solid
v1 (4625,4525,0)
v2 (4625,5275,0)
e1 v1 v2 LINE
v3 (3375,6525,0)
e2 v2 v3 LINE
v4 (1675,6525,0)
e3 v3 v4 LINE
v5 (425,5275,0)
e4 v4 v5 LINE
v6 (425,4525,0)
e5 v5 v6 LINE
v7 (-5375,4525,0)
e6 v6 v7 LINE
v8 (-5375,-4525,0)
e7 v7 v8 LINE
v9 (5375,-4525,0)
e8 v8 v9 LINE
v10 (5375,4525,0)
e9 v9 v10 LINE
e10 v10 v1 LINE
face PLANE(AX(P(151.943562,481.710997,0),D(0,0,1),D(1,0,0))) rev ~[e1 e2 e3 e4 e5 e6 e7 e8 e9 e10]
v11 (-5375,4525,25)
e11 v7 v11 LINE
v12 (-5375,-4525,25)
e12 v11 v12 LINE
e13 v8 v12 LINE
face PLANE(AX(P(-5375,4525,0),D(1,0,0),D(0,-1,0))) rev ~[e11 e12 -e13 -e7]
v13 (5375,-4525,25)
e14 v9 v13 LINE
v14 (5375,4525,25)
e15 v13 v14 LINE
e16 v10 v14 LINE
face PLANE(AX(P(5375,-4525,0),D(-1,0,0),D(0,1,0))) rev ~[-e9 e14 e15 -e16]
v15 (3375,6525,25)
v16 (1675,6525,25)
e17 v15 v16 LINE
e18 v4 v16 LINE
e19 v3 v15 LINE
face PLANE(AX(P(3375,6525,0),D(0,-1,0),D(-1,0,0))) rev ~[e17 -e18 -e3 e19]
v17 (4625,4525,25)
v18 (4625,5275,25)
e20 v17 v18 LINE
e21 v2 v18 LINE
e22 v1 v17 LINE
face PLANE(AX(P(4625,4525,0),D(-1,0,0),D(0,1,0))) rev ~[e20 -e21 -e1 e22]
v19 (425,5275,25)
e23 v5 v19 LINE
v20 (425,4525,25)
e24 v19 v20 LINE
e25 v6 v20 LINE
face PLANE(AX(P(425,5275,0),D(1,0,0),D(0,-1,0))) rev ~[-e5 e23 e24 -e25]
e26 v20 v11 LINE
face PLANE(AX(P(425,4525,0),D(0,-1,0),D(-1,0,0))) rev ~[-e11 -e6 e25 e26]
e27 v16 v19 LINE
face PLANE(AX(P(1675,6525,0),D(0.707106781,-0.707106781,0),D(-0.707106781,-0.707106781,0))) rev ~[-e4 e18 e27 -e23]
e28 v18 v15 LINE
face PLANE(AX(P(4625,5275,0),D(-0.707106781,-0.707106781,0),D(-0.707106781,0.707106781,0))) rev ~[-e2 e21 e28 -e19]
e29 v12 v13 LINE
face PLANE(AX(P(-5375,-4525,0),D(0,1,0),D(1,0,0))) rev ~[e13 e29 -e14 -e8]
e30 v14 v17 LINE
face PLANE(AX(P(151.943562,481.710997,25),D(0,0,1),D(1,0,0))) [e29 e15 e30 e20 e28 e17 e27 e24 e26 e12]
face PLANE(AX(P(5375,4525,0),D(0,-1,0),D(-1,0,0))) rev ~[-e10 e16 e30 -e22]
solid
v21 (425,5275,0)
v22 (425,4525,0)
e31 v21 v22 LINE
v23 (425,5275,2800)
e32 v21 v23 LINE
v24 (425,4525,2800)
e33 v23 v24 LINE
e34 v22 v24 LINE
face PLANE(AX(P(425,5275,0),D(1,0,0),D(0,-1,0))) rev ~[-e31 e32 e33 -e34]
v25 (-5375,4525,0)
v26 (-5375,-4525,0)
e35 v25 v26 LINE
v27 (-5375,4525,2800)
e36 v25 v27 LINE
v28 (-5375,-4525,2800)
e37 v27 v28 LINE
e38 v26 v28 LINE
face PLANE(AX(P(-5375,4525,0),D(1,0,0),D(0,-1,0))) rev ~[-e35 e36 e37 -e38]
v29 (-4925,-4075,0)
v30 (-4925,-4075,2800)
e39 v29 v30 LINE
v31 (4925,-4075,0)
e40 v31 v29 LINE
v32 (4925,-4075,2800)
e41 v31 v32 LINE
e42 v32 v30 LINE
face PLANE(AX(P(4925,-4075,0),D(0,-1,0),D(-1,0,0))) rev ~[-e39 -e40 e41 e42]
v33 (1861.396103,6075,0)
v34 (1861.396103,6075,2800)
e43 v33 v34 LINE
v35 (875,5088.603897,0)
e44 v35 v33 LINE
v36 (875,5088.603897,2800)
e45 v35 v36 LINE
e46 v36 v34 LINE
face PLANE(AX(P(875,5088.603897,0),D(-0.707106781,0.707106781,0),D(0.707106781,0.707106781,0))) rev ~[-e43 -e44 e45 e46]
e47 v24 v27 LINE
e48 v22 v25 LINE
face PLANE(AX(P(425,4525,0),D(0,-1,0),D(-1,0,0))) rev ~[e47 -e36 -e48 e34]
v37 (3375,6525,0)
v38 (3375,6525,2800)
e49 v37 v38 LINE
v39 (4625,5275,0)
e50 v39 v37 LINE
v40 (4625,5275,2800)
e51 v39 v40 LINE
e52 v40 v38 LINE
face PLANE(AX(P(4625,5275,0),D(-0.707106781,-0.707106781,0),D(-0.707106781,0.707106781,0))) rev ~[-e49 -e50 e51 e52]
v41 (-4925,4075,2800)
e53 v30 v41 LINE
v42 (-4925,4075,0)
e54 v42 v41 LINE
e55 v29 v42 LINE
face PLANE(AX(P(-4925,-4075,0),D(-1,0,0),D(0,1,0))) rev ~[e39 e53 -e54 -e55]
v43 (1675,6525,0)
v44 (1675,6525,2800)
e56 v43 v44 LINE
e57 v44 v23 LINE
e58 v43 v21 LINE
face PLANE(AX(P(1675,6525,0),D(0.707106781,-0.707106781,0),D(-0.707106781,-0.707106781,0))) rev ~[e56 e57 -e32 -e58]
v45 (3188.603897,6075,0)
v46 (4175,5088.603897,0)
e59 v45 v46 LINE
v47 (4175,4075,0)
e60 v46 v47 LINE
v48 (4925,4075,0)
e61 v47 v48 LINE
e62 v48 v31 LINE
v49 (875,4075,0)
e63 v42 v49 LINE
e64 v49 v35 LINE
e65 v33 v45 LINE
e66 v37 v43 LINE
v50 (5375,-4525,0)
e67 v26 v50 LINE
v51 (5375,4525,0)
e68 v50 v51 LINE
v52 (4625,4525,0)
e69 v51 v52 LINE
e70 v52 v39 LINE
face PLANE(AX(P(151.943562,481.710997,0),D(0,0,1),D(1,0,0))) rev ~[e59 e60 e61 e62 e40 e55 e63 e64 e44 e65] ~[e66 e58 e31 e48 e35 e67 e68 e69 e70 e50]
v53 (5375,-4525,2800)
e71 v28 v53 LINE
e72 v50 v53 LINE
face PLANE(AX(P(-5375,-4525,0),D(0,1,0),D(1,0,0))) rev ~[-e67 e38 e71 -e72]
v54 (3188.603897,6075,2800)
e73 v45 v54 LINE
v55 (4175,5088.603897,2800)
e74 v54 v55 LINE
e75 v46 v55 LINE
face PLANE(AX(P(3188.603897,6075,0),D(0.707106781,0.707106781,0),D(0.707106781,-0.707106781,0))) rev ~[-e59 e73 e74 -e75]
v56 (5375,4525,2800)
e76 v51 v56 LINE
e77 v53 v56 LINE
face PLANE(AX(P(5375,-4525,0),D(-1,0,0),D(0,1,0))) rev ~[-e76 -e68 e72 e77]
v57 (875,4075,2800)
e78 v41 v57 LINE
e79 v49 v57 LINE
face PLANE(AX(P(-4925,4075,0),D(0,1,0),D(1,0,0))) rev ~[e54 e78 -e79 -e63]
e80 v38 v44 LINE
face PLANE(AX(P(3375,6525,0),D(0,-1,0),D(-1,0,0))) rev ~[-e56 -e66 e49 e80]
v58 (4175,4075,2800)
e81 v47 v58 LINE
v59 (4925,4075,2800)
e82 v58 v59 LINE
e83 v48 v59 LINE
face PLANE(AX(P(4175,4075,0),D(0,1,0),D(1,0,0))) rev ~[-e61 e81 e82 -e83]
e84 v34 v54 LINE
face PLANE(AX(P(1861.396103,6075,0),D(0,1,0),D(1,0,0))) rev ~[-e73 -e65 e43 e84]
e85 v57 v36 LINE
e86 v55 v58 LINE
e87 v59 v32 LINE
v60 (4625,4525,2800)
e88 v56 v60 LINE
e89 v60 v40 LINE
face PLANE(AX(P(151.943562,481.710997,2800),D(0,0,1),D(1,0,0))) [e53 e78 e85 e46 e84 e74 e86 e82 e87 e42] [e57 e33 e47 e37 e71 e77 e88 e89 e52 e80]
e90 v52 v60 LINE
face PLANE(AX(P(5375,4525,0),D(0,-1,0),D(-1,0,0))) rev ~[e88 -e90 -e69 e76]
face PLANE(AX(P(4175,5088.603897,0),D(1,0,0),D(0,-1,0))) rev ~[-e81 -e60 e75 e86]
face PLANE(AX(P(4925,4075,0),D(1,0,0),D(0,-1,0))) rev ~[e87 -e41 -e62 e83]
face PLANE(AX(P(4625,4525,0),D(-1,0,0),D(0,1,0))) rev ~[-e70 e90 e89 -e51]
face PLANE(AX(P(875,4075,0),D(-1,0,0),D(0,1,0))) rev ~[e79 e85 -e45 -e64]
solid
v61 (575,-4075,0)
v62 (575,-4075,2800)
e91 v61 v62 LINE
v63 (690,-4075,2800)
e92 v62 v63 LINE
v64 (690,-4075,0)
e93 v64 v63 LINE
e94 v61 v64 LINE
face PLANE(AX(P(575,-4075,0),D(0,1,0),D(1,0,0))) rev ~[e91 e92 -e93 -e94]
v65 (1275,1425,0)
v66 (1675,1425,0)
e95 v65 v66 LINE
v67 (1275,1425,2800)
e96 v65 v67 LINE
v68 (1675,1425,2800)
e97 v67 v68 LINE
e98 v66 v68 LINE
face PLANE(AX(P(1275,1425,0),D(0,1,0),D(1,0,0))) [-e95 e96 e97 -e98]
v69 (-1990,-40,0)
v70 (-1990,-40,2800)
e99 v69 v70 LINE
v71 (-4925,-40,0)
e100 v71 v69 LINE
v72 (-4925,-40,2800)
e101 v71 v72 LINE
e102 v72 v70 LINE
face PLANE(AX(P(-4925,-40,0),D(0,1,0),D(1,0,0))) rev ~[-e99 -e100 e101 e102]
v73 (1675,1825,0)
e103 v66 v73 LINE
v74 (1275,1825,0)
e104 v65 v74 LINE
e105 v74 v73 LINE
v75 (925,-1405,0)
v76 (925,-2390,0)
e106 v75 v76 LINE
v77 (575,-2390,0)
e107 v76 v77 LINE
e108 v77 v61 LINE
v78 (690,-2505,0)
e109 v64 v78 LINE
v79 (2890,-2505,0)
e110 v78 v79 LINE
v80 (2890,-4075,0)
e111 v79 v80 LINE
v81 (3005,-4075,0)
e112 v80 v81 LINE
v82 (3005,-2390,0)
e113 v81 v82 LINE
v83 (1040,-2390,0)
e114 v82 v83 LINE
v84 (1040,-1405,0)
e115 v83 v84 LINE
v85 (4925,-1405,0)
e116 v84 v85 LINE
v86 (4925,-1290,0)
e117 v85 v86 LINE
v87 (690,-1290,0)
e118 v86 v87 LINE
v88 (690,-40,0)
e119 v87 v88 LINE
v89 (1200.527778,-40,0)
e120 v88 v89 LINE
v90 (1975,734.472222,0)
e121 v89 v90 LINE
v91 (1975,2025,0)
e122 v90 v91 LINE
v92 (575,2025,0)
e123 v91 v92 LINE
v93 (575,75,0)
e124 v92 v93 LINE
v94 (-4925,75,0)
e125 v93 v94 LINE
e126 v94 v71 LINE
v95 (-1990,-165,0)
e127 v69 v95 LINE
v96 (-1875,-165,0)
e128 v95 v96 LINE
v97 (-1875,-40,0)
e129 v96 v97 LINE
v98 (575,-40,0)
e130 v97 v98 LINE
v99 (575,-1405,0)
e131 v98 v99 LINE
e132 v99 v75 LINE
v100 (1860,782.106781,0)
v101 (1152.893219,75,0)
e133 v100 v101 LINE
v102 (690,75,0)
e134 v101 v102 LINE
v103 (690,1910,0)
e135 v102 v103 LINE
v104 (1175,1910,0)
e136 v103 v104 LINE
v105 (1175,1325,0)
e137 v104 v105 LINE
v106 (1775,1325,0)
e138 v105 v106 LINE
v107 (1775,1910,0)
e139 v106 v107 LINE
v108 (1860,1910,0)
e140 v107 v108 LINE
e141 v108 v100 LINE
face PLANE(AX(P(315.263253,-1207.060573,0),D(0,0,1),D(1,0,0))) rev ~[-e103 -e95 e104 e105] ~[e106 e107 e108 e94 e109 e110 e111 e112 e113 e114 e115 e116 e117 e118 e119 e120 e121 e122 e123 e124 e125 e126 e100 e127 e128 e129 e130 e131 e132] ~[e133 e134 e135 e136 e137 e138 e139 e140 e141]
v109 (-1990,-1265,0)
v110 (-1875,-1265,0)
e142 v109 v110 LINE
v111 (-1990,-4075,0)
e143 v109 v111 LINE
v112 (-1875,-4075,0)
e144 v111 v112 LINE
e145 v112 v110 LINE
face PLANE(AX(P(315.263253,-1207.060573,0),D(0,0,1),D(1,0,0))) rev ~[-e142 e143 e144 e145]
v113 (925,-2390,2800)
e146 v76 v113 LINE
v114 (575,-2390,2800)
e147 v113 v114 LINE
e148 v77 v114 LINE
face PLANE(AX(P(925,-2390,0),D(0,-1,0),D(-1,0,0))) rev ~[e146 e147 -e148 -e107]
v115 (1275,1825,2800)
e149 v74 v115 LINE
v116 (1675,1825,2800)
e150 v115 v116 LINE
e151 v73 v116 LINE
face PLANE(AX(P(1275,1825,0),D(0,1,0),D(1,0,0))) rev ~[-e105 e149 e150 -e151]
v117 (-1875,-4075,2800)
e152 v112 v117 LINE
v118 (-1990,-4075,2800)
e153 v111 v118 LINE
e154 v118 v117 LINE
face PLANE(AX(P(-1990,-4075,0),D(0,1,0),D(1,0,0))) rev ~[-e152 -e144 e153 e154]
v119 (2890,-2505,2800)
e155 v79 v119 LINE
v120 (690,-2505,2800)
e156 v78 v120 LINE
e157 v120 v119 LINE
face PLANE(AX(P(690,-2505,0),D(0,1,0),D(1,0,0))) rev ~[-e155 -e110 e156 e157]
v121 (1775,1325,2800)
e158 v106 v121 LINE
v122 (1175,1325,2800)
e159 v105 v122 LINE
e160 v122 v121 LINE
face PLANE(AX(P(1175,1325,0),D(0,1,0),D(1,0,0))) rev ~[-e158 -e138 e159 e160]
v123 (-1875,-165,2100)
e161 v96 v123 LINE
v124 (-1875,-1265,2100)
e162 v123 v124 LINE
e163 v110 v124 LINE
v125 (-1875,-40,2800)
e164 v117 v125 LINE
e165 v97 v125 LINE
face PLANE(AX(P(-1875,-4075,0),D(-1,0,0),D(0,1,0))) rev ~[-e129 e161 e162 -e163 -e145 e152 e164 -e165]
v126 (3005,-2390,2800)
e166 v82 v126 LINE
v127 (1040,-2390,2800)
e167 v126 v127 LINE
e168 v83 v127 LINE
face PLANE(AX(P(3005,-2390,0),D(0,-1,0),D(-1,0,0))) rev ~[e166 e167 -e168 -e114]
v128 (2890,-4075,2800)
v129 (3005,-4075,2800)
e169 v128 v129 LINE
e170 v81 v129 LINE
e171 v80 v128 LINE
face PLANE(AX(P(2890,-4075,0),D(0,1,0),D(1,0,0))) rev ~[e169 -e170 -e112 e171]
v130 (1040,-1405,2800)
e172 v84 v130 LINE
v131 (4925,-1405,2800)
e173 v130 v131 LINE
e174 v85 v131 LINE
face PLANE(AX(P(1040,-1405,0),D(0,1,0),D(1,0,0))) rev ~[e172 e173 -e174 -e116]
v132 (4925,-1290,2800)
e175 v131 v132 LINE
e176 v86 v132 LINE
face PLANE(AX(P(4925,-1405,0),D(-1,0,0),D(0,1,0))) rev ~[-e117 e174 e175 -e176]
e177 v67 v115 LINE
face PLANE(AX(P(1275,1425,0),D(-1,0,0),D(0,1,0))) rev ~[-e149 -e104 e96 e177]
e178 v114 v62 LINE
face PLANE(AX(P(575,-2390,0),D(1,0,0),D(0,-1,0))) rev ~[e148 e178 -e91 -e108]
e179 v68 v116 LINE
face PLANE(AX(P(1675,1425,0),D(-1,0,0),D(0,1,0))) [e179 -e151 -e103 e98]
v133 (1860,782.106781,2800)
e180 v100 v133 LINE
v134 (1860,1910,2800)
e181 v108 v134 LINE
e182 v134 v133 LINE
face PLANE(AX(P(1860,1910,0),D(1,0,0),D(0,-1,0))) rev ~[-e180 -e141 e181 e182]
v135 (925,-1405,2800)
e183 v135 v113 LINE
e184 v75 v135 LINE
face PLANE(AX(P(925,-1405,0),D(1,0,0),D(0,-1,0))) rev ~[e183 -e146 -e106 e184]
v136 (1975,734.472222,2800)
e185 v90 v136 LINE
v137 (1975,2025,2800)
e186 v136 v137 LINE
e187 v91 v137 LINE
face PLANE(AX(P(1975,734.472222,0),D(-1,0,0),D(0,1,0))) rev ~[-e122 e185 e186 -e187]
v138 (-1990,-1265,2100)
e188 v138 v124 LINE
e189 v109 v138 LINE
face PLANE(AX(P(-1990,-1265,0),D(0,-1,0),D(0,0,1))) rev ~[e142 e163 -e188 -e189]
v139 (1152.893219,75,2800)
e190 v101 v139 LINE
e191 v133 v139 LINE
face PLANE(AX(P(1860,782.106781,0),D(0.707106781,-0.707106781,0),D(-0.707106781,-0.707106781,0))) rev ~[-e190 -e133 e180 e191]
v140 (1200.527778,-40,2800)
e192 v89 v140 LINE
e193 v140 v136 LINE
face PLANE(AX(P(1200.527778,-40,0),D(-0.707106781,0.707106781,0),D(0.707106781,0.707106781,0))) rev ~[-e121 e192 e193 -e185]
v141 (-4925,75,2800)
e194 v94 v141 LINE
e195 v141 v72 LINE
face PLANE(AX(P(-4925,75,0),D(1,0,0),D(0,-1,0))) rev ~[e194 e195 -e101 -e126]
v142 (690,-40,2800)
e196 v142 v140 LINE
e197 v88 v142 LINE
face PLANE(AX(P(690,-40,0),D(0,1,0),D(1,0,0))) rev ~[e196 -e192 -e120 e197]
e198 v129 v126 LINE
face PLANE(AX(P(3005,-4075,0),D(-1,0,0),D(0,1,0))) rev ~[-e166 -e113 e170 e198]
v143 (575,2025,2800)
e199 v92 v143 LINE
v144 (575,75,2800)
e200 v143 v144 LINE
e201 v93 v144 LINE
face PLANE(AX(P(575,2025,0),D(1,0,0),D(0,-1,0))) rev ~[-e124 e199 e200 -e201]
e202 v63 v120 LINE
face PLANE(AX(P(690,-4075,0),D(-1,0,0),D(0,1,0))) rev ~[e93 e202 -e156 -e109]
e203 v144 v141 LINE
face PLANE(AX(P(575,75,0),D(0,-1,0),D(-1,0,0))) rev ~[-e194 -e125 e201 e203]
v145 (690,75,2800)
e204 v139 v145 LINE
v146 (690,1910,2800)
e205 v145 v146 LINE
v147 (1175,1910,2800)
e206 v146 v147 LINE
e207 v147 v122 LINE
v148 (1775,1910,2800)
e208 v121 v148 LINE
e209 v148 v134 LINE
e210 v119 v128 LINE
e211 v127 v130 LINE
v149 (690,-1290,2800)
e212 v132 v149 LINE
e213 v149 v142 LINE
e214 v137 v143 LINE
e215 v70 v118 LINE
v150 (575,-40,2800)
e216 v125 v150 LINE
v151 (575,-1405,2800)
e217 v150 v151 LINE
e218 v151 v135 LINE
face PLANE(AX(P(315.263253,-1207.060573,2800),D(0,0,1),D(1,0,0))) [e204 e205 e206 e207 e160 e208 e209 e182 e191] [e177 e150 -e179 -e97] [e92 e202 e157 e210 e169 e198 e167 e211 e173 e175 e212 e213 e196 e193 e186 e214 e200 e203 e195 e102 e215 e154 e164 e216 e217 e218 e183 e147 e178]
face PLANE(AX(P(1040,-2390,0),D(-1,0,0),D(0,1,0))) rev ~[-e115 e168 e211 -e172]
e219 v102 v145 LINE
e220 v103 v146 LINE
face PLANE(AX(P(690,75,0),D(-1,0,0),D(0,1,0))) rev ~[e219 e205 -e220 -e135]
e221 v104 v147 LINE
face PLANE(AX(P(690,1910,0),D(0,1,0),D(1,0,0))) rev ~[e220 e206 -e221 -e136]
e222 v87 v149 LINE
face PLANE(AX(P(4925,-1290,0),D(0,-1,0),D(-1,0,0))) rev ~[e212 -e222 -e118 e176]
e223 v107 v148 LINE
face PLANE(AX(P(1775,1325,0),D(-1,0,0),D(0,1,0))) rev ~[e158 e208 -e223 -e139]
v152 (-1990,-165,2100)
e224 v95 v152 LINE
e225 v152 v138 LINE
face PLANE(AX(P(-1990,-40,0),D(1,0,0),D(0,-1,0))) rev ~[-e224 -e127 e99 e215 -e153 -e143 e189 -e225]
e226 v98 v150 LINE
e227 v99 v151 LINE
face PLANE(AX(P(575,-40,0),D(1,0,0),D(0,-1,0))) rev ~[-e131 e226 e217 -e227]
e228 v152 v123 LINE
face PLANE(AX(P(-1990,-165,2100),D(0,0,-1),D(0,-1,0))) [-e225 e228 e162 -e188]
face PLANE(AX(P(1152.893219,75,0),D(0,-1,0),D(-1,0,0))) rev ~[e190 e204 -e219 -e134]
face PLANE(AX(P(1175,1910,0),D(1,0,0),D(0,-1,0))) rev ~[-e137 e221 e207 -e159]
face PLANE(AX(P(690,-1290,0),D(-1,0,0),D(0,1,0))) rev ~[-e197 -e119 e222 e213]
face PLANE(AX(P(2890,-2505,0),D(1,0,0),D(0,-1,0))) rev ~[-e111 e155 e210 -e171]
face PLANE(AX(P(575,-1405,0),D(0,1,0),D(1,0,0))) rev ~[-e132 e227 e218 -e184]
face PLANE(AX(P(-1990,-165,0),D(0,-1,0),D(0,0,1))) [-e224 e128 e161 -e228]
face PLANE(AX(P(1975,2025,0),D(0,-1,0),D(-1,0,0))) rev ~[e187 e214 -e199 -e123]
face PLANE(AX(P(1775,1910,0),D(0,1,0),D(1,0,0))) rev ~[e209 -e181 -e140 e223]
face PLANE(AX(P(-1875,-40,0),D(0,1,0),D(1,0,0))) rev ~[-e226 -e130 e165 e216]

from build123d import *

# Parameters (mm, degrees)
F0_W     = 2935
F0_H     = 4035
F0_W_2   = 400
F0_H_2   = 400
F0_W_3   = 2200
F0_H_3   = 1570
F1_DEPTH = 25
F2_DEPTH = 2800
F3_DEPTH = 2800
F4_W     = 1100
F4_H     = 2100
F5_DEPTH = 115


with BuildPart() as f1:
    # F0 (on Top) → F1 (new body)
    with BuildSketch(Plane.XY):
        Polygon((-5375, -4525), (5375, -4525), (5375, 4525), (4625, 4525), (4625, 5275), (3375, 6525), (2956.3961030679, 6525), (2086.3961030679, 6525), (1675, 6525), (425, 5275), (425, 4525), (-149.870057106, 4525), (-1879.870057106, 4525), (-2737.3004150391, 4525), (-4467.3004150391, 4525), (-5375, 4525), align=None)
        Polygon((-149.870057106, 4075), (875, 4075), (875, 5088.6038969321), (1861.3961030679, 6075), (2086.3961030679, 6075), (2956.3961030679, 6075), (3188.6038969321, 6075), (4175, 5088.6038969321), (4175, 4075), (4925, 4075), (4925, 2025), (4925, -1290), (4925, -1405), (4925, -4075), (3005, -4075), (2890, -4075), (690, -4075), (575, -4075), (-1875, -4075), (-1990, -4075), (-4925, -4075), (-4925, -40), (-4925, 75), (-4925, 4075), (-4467.3004150391, 4075), (-2737.3004150391, 4075), (-1879.870057106, 4075), align=None, mode=Mode.SUBTRACT)
        Polygon((875, 5088.6038969321), (875, 4075), (-149.870057106, 4075), (-1879.870057106, 4075), (-2737.3004150391, 4075), (-4467.3004150391, 4075), (-4925, 4075), (-4925, 75), (-1875, 75), (575, 75), (575, 2025), (1975, 2025), (4925, 2025), (4925, 4075), (4175, 4075), (4175, 5088.6038969321), (3188.6038969321, 6075), (2956.3961030679, 6075), (2086.3961030679, 6075), (1861.3961030679, 6075), align=None)
        with Locations((-3457.5, -2057.5)):
            Rectangle(F0_W, F0_H)
        Polygon((4925, -1290), (4925, 2025), (1975, 2025), (1975, 734.4722215136), (1200.5277784864, -40), (690, -40), (690, -1290), align=None)
        Polygon((-1875, -775), (-1875, -4075), (575, -4075), (575, -2390), (925, -2390), (925, -1405), (575, -1405), (575, -1290), (575, -40), (-1875, -40), align=None)
        Polygon((4925, -4075), (4925, -1405), (1040, -1405), (1040, -2390), (3005, -2390), (3005, -4075), align=None)
        Polygon((-1875, 75), (-4925, 75), (-4925, -40), (-1990, -40), (-1990, -4075), (-1875, -4075), (-1875, -775), (-1875, -40), (575, -40), (575, -1290), (575, -1405), (925, -1405), (925, -2390), (575, -2390), (575, -4075), (690, -4075), (690, -2505), (2890, -2505), (2890, -4075), (3005, -4075), (3005, -2390), (1040, -2390), (1040, -1405), (4925, -1405), (4925, -1290), (690, -1290), (690, -40), (1200.5277784864, -40), (1975, 734.4722215136), (1975, 2025), (575, 2025), (575, 75), align=None)
        Polygon((1152.8932188135, 75), (690, 75), (690, 1910), (1175, 1910), (1175, 1325), (1775, 1325), (1775, 1910), (1860, 1910), (1860, 782.1067811865), align=None, mode=Mode.SUBTRACT)
        with Locations((1475, 1625)):
            Rectangle(F0_W_2, F0_H_2, mode=Mode.SUBTRACT)
        with Locations((1790, -3290)):
            Rectangle(F0_W_3, F0_H_3)
        Polygon((690, 1910), (690, 75), (1152.8932188135, 75), (1860, 782.1067811865), (1860, 1910), (1775, 1910), (1775, 1325), (1175, 1325), (1175, 1910), align=None)
        with Locations((1475, 1625)):
            Rectangle(F0_W_2, F0_H_2)
    extrude(amount=F1_DEPTH)


with BuildPart() as f2:
    # F0 (on Top) → F2 (new body)
    with BuildSketch(Plane.XY):
        Polygon((-5375, -4525), (5375, -4525), (5375, 4525), (4625, 4525), (4625, 5275), (3375, 6525), (2956.3961030679, 6525), (2086.3961030679, 6525), (1675, 6525), (425, 5275), (425, 4525), (-149.870057106, 4525), (-1879.870057106, 4525), (-2737.3004150391, 4525), (-4467.3004150391, 4525), (-5375, 4525), align=None)
        Polygon((-149.870057106, 4075), (875, 4075), (875, 5088.6038969321), (1861.3961030679, 6075), (2086.3961030679, 6075), (2956.3961030679, 6075), (3188.6038969321, 6075), (4175, 5088.6038969321), (4175, 4075), (4925, 4075), (4925, 2025), (4925, -1290), (4925, -1405), (4925, -4075), (3005, -4075), (2890, -4075), (690, -4075), (575, -4075), (-1875, -4075), (-1990, -4075), (-4925, -4075), (-4925, -40), (-4925, 75), (-4925, 4075), (-4467.3004150391, 4075), (-2737.3004150391, 4075), (-1879.870057106, 4075), align=None, mode=Mode.SUBTRACT)
    extrude(amount=F2_DEPTH)


with BuildPart() as f3:
    # F0 (on Top) → F3 (new body, through all)
    with BuildSketch(Plane.XY):
        Polygon((-1875, 75), (-4925, 75), (-4925, -40), (-1990, -40), (-1990, -4075), (-1875, -4075), (-1875, -775), (-1875, -40), (575, -40), (575, -1290), (575, -1405), (925, -1405), (925, -2390), (575, -2390), (575, -4075), (690, -4075), (690, -2505), (2890, -2505), (2890, -4075), (3005, -4075), (3005, -2390), (1040, -2390), (1040, -1405), (4925, -1405), (4925, -1290), (690, -1290), (690, -40), (1200.5277784864, -40), (1975, 734.4722215136), (1975, 2025), (575, 2025), (575, 75), align=None)
        Polygon((1152.8932188135, 75), (690, 75), (690, 1910), (1175, 1910), (1175, 1325), (1775, 1325), (1775, 1910), (1860, 1910), (1860, 782.1067811865), align=None, mode=Mode.SUBTRACT)
        with Locations((1475, 1625)):
            Rectangle(F0_W_2, F0_H_2, mode=Mode.SUBTRACT)
    extrude(amount=F3_DEPTH)

    # F4 (on face) → F5 (cut, through all)
    with BuildSketch(Plane(origin=(-1990, 0, 0), x_dir=(0, -1, 0), z_dir=(-1, 0, 0))):
        with Locations((715, 1050)):
            Rectangle(F4_W, F4_H)
    extrude(amount=-F5_DEPTH, mode=Mode.SUBTRACT)


solid = Compound([f1.part, f2.part, f3.part])
